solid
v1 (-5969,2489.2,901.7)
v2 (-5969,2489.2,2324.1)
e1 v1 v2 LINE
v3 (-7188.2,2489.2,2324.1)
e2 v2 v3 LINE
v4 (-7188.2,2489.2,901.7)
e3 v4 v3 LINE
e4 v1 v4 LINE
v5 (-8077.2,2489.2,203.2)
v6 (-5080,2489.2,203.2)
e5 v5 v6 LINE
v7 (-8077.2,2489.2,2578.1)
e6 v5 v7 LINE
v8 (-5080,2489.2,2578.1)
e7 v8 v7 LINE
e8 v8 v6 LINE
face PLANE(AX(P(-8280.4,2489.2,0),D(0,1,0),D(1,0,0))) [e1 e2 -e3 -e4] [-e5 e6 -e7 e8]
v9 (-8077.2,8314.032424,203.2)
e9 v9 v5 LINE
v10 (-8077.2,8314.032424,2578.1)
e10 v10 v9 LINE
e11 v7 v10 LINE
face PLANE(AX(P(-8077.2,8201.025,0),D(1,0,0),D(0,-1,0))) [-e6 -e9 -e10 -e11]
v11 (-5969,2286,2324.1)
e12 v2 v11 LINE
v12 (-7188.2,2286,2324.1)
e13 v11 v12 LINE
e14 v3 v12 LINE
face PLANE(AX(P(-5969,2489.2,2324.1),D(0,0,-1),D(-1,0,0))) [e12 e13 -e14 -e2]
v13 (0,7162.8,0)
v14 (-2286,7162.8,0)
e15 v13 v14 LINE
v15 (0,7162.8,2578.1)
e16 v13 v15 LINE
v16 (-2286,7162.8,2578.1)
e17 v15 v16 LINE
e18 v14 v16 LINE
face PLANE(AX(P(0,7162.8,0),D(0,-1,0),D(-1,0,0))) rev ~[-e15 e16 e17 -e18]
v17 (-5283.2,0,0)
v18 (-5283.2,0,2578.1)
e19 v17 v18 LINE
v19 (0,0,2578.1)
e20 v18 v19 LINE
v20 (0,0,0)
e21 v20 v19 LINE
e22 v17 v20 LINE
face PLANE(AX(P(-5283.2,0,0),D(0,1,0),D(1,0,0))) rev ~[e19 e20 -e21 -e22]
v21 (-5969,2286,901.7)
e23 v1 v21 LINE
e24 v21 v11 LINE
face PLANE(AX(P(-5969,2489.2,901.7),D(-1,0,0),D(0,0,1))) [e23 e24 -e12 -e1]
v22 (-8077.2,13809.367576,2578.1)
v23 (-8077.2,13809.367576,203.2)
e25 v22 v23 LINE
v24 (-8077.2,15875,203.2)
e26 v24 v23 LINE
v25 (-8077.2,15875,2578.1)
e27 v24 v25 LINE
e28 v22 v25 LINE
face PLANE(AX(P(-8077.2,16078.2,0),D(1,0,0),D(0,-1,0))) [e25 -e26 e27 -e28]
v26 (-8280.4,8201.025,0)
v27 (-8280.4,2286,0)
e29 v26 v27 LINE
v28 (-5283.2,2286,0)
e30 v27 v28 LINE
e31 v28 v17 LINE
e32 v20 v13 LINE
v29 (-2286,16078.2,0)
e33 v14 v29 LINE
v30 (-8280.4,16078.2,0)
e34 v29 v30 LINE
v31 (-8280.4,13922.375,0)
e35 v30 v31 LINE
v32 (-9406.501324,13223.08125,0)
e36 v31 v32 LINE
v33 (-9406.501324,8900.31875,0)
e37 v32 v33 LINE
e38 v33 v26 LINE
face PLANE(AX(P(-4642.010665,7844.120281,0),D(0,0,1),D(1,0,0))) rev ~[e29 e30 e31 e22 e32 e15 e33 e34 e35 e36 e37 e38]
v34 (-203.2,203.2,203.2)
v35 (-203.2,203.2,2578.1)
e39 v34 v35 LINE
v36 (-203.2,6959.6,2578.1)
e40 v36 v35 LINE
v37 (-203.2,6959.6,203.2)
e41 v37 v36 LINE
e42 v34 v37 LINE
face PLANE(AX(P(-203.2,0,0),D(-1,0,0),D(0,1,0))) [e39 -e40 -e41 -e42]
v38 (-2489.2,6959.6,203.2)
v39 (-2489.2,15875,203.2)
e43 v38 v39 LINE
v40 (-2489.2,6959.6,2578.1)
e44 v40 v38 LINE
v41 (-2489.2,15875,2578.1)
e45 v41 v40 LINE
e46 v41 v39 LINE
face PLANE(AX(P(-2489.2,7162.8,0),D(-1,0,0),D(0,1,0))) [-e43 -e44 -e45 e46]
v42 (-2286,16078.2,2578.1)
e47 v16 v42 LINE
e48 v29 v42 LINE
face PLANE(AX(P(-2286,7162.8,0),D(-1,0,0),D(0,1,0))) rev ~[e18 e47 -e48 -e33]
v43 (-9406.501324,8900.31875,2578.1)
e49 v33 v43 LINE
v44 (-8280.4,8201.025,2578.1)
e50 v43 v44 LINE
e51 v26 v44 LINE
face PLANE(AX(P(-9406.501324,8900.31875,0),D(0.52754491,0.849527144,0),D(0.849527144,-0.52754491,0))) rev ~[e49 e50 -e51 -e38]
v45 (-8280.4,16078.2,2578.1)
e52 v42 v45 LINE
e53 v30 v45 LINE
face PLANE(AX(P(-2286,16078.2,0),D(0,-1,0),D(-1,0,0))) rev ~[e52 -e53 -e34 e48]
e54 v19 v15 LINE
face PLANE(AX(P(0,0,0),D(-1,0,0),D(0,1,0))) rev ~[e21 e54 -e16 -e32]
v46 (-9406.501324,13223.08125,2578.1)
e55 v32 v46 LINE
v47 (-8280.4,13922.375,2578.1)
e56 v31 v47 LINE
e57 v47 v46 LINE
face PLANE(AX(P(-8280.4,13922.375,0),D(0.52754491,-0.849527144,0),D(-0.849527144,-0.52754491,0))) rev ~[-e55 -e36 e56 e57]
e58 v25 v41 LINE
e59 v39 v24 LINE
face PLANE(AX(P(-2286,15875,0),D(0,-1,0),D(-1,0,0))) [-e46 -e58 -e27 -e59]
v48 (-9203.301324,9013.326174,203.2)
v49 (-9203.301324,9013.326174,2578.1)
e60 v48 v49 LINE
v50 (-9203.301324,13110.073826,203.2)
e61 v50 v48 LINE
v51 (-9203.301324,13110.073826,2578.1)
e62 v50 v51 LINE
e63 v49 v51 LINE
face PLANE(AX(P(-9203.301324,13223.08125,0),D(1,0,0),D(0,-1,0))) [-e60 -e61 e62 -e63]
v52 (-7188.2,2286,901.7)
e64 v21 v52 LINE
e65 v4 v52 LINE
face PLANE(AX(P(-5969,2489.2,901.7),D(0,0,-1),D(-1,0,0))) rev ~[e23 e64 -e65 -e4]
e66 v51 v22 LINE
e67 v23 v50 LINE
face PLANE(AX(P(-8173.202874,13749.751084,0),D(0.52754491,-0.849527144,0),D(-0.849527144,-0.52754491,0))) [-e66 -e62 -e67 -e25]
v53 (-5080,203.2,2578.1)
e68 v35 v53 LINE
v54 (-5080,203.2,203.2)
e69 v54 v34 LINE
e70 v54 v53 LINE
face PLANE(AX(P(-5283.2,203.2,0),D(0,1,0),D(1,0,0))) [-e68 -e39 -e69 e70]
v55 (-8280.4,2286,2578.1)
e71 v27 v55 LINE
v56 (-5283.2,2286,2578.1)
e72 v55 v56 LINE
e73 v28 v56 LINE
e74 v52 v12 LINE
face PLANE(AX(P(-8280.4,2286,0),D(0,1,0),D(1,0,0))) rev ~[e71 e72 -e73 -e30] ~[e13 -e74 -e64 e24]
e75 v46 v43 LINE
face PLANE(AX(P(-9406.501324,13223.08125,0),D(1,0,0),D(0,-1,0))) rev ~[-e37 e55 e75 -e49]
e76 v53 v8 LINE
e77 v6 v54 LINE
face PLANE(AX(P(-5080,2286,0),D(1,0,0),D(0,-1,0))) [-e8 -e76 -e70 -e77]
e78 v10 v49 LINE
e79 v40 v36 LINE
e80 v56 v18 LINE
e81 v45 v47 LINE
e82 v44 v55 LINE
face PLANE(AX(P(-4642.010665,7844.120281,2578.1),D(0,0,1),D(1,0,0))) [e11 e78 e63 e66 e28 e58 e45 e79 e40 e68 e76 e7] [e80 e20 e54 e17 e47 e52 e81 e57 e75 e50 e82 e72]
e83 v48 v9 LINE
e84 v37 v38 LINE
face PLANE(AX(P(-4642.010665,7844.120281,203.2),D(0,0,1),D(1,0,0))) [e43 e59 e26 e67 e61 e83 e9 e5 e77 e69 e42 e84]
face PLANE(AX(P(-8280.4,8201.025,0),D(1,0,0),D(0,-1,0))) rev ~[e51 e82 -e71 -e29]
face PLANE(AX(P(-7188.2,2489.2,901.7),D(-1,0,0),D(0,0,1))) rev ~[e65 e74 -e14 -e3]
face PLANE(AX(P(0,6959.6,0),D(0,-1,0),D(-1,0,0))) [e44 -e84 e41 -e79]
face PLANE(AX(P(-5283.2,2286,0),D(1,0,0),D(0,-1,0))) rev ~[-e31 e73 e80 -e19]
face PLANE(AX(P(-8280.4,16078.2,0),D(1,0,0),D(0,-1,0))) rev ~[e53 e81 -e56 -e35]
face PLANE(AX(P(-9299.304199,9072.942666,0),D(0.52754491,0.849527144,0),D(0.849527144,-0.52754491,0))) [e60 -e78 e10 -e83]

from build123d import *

# Parameters (mm, degrees)
F1_DEPTH = 2578.1
F2_T     = -203.2
F3_W     = 1219.2
F3_H     = 1422.4
F5_DEPTH = 203.2


# Not quite as in the source:
# - a feature of the source that left no trace in its solid (it failed there, or was rolled back) is left out


with BuildPart() as f1:
    # F0 (on Top) → F1 (new body)
    with BuildSketch(Plane.XY):
        Polygon((-2286, 16078.2), (-8280.4, 16078.2), (-8280.4, 13922.375), (-9406.501324312, 13223.08125), (-9406.501324312, 8900.31875), (-8280.4, 8201.025), (-8280.4, 2286), (-5283.2, 2286), (-5283.2, 0), (0, 0), (0, 7162.8), (-2286, 7162.8), align=None)
    extrude(amount=F1_DEPTH)

    # F2
    f2_openings = [f1.faces().sort_by_distance(p)[0] for p in [
        (-4762.628229, 7961.579676, 2578.1),
    ]]
    offset(amount=F2_T, openings=f2_openings, kind=Kind.INTERSECTION)

    # F3 (on face) → F5 (cut, through all)
    with BuildSketch(Plane(origin=(0, 2489.2, 0), x_dir=(-1, 0, 0), z_dir=(0, 1, 0))):
        with Locations((6578.6, 1612.9)):
            Rectangle(F3_W, F3_H)
    extrude(amount=-F5_DEPTH, mode=Mode.SUBTRACT)


solid = f1.part
